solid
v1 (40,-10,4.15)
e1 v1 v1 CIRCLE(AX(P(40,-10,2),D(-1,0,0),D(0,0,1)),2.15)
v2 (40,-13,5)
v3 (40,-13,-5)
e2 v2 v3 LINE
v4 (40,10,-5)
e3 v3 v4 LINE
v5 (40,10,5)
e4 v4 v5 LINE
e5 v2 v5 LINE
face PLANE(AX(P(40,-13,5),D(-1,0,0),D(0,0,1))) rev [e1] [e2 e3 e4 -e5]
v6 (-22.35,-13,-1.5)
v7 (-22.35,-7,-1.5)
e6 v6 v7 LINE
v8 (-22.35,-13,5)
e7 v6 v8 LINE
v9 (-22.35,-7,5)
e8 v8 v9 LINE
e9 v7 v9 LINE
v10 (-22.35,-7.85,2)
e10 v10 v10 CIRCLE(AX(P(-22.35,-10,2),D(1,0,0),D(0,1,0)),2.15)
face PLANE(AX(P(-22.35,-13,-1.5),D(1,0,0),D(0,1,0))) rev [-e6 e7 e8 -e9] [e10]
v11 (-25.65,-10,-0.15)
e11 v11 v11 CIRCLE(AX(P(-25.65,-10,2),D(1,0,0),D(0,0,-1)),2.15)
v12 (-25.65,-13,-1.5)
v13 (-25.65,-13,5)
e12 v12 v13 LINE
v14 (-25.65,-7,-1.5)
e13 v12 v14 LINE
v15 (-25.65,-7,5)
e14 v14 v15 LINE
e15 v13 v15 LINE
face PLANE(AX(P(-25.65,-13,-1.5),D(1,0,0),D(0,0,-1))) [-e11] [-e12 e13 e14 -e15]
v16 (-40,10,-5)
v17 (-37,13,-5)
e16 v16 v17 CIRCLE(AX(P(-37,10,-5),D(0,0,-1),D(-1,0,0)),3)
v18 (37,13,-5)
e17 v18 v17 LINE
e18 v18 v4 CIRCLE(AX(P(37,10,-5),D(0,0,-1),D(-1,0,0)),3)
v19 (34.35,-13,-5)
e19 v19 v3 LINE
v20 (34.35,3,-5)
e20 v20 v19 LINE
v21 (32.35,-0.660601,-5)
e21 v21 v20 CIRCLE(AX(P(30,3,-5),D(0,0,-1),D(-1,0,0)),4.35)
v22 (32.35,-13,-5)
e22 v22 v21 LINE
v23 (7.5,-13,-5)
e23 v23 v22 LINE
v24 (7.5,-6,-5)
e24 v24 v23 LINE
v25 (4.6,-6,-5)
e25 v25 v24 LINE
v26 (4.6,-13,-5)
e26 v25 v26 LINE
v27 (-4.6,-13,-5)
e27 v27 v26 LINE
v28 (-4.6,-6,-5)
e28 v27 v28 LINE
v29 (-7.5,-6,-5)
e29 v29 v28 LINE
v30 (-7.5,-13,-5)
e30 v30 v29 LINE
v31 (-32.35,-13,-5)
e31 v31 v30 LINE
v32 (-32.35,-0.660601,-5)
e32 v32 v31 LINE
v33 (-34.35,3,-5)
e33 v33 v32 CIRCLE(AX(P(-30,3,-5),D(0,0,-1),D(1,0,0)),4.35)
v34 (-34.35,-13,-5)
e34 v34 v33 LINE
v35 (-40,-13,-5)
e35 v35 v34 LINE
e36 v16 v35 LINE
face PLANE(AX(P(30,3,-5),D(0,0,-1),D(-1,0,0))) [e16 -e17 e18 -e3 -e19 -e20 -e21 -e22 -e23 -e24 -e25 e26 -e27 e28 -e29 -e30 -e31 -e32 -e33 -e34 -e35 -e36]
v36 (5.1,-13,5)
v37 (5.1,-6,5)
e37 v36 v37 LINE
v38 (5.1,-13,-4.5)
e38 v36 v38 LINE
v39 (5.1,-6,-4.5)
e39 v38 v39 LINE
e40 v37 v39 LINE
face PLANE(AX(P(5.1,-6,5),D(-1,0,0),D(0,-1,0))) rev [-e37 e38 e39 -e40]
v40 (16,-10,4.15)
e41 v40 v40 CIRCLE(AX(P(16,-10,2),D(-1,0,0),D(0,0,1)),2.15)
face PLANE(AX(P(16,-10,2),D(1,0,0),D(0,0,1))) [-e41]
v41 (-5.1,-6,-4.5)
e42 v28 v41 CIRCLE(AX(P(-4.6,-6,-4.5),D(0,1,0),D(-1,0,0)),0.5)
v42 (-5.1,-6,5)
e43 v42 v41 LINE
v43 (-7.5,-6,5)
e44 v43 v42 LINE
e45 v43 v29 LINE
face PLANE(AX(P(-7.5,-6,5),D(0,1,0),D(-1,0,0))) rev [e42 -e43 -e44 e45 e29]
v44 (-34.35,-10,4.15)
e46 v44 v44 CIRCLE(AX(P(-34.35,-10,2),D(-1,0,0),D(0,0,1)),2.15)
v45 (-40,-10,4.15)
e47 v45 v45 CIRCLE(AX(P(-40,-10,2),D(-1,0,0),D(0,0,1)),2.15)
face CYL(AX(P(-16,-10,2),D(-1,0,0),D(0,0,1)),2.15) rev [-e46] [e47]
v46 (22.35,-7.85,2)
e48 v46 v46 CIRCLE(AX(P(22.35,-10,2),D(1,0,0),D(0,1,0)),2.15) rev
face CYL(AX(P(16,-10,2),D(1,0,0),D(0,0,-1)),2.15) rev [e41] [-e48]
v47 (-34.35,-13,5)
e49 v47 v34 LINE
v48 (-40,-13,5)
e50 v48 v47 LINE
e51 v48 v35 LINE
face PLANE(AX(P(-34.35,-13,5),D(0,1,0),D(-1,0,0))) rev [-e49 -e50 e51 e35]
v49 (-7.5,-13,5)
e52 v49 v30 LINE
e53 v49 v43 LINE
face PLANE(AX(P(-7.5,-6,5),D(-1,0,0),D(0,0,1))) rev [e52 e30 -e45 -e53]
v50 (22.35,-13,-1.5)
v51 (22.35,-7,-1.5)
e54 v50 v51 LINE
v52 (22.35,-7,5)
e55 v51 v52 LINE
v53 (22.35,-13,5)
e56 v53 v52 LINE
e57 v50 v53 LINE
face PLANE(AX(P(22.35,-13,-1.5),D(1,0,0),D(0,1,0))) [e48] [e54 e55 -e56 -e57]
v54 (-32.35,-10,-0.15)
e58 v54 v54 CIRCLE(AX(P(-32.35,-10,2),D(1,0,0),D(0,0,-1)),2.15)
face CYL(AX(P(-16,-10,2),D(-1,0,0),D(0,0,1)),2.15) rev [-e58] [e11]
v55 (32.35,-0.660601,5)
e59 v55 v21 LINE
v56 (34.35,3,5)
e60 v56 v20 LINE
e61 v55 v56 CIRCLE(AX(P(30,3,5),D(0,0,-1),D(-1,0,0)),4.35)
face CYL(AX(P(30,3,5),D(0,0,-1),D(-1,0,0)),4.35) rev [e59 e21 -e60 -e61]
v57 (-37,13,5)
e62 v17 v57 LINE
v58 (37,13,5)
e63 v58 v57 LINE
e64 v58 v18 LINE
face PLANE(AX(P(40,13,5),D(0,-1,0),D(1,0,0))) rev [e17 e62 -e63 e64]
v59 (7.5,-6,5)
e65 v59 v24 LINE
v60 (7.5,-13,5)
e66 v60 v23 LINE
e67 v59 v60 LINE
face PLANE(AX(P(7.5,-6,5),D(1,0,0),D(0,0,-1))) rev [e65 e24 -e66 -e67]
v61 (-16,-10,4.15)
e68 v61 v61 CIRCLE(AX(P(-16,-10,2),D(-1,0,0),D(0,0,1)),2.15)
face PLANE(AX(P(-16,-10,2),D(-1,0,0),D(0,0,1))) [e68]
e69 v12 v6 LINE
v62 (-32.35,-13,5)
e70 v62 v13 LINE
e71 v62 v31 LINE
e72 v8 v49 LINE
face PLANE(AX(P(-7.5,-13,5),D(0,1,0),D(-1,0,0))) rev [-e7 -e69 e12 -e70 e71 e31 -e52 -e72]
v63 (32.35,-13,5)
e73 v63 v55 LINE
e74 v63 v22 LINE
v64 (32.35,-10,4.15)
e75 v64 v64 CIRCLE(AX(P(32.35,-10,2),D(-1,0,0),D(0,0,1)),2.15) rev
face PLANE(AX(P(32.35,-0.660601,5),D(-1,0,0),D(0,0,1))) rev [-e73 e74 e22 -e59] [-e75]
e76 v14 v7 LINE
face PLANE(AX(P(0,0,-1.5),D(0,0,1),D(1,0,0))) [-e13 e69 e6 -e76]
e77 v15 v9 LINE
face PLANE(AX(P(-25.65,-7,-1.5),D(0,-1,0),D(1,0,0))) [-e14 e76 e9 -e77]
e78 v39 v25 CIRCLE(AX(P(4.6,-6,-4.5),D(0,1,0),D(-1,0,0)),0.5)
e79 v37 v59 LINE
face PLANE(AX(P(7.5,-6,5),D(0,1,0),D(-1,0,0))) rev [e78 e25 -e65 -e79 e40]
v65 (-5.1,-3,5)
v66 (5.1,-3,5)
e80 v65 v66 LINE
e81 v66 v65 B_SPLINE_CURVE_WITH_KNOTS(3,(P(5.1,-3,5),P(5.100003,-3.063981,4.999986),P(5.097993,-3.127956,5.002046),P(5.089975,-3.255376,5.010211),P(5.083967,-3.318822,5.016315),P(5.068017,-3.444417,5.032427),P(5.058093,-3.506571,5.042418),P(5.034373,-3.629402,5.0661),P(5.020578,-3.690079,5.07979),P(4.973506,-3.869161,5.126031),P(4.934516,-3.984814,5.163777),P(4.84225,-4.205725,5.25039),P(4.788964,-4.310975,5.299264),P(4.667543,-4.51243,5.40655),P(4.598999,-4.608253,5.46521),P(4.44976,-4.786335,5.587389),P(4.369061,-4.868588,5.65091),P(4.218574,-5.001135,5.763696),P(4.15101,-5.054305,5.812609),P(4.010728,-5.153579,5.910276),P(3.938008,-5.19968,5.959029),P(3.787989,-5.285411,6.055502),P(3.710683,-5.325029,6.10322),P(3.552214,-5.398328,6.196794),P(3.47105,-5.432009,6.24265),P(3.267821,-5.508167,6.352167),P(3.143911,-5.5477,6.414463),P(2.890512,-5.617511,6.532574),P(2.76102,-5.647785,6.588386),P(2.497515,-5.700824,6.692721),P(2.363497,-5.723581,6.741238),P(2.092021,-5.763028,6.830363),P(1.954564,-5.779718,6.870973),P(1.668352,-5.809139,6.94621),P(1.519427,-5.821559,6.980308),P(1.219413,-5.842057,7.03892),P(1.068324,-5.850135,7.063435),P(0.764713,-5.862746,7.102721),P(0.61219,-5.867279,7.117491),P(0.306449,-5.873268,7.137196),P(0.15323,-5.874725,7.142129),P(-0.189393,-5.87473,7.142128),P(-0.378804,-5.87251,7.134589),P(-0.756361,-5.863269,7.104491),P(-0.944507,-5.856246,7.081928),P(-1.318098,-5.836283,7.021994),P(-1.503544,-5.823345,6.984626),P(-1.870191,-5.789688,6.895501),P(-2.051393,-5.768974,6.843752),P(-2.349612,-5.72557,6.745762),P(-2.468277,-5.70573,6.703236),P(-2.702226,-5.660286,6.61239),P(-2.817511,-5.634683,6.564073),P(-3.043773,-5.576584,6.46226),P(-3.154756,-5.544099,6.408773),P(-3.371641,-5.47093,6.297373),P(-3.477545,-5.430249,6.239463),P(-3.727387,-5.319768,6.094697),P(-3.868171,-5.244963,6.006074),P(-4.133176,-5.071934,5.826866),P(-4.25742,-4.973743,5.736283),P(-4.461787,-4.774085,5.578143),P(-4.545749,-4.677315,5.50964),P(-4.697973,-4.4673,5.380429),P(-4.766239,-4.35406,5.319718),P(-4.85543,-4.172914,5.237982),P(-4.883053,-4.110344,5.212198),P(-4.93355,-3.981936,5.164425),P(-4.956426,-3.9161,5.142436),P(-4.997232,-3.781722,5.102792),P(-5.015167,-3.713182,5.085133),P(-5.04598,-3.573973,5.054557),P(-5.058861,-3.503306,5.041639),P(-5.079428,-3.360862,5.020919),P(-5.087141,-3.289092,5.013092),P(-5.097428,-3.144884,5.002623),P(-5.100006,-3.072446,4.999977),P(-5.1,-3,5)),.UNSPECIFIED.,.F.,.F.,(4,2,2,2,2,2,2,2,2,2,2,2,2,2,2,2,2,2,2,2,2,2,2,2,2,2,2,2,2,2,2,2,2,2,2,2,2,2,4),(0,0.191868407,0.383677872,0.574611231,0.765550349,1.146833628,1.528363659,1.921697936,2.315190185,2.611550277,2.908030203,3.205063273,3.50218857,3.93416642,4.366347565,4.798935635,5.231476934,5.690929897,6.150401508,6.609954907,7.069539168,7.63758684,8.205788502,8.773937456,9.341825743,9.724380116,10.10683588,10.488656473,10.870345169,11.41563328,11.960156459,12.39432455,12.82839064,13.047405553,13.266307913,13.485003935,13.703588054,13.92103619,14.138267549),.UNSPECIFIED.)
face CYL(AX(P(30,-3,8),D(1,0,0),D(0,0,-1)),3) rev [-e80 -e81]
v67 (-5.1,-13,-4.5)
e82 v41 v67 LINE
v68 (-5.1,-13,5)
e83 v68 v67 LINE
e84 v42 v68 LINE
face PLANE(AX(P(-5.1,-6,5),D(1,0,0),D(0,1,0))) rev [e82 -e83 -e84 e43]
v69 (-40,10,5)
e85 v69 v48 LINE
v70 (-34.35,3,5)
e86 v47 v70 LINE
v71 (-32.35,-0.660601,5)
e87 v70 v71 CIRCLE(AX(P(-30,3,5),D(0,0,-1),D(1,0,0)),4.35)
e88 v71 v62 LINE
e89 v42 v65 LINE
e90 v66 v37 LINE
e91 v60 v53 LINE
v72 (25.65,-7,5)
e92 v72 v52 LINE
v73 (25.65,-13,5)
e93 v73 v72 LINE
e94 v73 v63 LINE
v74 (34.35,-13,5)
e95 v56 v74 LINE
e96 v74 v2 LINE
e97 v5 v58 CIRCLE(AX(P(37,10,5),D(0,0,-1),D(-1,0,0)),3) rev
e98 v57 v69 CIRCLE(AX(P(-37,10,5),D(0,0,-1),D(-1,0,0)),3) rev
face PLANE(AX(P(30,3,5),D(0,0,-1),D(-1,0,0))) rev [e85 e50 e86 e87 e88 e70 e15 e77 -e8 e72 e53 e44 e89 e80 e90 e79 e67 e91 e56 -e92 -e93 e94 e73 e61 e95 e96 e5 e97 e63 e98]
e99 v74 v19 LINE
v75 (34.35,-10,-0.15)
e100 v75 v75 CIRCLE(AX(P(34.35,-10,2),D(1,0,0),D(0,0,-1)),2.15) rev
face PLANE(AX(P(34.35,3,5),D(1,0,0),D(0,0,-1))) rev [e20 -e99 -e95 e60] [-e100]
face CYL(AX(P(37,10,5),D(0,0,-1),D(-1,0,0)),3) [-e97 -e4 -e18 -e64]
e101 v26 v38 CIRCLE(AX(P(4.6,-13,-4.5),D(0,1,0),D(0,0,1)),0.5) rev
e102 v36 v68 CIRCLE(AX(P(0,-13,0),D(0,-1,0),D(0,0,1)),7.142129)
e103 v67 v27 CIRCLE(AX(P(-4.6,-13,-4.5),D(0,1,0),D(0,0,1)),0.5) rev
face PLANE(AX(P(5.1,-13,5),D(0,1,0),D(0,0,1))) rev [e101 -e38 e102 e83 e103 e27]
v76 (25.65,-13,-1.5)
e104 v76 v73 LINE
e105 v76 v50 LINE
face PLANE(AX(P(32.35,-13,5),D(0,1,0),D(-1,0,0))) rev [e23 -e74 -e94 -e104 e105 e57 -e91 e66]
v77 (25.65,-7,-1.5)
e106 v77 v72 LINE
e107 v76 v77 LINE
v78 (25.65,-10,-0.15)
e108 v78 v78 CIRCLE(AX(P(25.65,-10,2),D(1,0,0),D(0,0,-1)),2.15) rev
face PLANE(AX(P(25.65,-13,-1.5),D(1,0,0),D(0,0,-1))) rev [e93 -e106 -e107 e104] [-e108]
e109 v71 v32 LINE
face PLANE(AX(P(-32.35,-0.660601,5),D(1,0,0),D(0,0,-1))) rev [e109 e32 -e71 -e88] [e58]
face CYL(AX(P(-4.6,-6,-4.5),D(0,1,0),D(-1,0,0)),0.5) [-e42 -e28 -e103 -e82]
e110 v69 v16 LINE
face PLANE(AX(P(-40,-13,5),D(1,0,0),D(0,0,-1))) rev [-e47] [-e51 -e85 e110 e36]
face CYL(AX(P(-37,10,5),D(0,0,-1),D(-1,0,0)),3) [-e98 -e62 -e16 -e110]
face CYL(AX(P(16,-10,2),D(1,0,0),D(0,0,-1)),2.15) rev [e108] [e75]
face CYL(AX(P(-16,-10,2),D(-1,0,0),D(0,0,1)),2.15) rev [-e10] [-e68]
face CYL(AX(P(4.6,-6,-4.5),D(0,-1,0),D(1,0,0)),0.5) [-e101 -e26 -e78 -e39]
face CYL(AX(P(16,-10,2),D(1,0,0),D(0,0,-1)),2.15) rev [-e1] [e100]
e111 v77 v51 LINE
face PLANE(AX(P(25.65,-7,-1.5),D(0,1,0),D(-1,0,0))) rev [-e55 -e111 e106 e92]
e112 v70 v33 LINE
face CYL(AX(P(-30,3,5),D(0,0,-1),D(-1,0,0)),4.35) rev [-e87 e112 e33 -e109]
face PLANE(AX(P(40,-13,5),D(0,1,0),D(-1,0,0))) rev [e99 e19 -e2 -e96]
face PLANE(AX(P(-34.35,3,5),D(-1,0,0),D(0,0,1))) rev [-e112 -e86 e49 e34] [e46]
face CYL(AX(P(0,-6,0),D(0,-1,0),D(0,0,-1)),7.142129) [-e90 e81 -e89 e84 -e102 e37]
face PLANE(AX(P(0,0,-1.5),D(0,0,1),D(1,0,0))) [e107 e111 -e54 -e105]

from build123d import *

# Parameters (mm, degrees)
BOSS_EXTRUDE1_DEPTH = 5
SKETCH2_W           = 3.3
SKETCH2_H           = 6
CUT_EXTRUDE2_DEPTH  = 6.5
SKETCH3_R           = 2.15
CUT_EXTRUDE4_DEPTH  = 24
FILLET1_R           = 0.5
FILLET2_R           = 3
BOSS_EXTRUDE2_DEPTH = 7
FILLET3_R           = 3


with BuildPart() as part:
    # Sketch1 → Boss-Extrude1 (new, symmetric)
    with BuildSketch(Plane.XY):
        with BuildLine():
            Line((40, -13), (34.35, -13))
            Line((34.35, -13), (34.35, 3))
            ThreePointArc((34.35, 3), (26.182605601, 5.085665361), (32.35, -0.660601044))
            Line((32.35, -0.660601044), (32.35, -13))
            Line((32.35, -13), (7.5, -13))
            Line((7.5, -13), (7.5, -6))
            Line((7.5, -6), (5.1, -6))
            Line((5.1, -6), (5.1, -13))
            Line((5.1, -13), (-5.1, -13))
            Line((-5.1, -13), (-5.1, -6))
            Line((-5.1, -6), (-7.5, -6))
            Line((-7.5, -6), (-7.5, -13))
            Line((-7.5, -13), (-32.35, -13))
            Line((-32.35, -13), (-32.35, -0.660601044))
            ThreePointArc((-32.35, -0.660601044), (-26.182605601, 5.085665361), (-34.35, 3))
            Line((-34.35, 3), (-34.35, -13))
            Line((-34.35, -13), (-40, -13))
            Line((-40, -13), (-40, 13))
            Line((-40, 13), (40, 13))
            Line((40, 13), (40, -13))
        make_face()
    extrude(amount=BOSS_EXTRUDE1_DEPTH, both=True)

    # Sketch2 → Cut-Extrude2 (cut)
    with BuildSketch(Plane.XY.offset(5)):
        with Locations((-24, -10)):
            Rectangle(SKETCH2_W, SKETCH2_H)
        with Locations((24, -10)):
            Rectangle(SKETCH2_W, SKETCH2_H)
    extrude(amount=-CUT_EXTRUDE2_DEPTH, mode=Mode.SUBTRACT)

    # Sketch3 → Cut-Extrude4 (cut)
    with BuildSketch(Plane.ZY.offset(40)):
        with Locations(Location((2, -10, 0), (0, 0, 180))):
            Circle(SKETCH3_R)
    cut_extrude4 = extrude(amount=-CUT_EXTRUDE4_DEPTH, mode=Mode.SUBTRACT)

    # Mirror1: Cut-Extrude4 across plane
    add(cut_extrude4.mirror(Plane(origin=(0, 0, 0), x_dir=(0, 0, 1), z_dir=(1, 0, 0))), mode=Mode.SUBTRACT)

    # Fillet1
    fillet1_edges = [part.edges().sort_by_distance(p)[0] for p in [
        (5.1, -9.5, -5),
        (-5.1, -9.5, -5),
    ]]
    fillet(fillet1_edges, radius=FILLET1_R)

    # Fillet2
    fillet2_edges = [part.edges().sort_by_distance(p)[0] for p in [
        (-40, 13, 0),
        (40, 13, 0),
    ]]
    fillet(fillet2_edges, radius=FILLET2_R)

    # Sketch4 → Boss-Extrude2 (add)
    with BuildSketch(Plane.XZ.offset(13)):
        with BuildLine():
            Line((-5.1, 5), (5.1, 5))
            ThreePointArc((5.1, 5), (0, 7.142128534), (-5.1, 5))
        make_face()
    extrude(amount=-BOSS_EXTRUDE2_DEPTH)

    # Fillet3
    # the kernel refuses this fillet: 3 mm, written as the material it adds along each edge
    with BuildSketch(Plane(origin=(-12.6, -6, 5), x_dir=(0, 1, 0), z_dir=(1, 0, 0))) as fillet3_piece_1_section:
        with BuildLine():
            CenterArc((FILLET3_R, FILLET3_R), FILLET3_R, 180, 90)
            Line((0, FILLET3_R), (0, 0))
            Line((0, 0), (FILLET3_R, 0))
        make_face()
    fillet3_piece_1 = extrude(amount=25.2, mode=Mode.PRIVATE)
    fillet3_piece_1 = fillet3_piece_1 & Plane(origin=(0, -5.25920744, 0), x_dir=(0.7140728391445785, 0, 0.7000714109260576), z_dir=(0, -1, 0)) * Cylinder(7.142128534, 63, mode=Mode.PRIVATE)
    add(fillet3_piece_1)


solid = part.part
